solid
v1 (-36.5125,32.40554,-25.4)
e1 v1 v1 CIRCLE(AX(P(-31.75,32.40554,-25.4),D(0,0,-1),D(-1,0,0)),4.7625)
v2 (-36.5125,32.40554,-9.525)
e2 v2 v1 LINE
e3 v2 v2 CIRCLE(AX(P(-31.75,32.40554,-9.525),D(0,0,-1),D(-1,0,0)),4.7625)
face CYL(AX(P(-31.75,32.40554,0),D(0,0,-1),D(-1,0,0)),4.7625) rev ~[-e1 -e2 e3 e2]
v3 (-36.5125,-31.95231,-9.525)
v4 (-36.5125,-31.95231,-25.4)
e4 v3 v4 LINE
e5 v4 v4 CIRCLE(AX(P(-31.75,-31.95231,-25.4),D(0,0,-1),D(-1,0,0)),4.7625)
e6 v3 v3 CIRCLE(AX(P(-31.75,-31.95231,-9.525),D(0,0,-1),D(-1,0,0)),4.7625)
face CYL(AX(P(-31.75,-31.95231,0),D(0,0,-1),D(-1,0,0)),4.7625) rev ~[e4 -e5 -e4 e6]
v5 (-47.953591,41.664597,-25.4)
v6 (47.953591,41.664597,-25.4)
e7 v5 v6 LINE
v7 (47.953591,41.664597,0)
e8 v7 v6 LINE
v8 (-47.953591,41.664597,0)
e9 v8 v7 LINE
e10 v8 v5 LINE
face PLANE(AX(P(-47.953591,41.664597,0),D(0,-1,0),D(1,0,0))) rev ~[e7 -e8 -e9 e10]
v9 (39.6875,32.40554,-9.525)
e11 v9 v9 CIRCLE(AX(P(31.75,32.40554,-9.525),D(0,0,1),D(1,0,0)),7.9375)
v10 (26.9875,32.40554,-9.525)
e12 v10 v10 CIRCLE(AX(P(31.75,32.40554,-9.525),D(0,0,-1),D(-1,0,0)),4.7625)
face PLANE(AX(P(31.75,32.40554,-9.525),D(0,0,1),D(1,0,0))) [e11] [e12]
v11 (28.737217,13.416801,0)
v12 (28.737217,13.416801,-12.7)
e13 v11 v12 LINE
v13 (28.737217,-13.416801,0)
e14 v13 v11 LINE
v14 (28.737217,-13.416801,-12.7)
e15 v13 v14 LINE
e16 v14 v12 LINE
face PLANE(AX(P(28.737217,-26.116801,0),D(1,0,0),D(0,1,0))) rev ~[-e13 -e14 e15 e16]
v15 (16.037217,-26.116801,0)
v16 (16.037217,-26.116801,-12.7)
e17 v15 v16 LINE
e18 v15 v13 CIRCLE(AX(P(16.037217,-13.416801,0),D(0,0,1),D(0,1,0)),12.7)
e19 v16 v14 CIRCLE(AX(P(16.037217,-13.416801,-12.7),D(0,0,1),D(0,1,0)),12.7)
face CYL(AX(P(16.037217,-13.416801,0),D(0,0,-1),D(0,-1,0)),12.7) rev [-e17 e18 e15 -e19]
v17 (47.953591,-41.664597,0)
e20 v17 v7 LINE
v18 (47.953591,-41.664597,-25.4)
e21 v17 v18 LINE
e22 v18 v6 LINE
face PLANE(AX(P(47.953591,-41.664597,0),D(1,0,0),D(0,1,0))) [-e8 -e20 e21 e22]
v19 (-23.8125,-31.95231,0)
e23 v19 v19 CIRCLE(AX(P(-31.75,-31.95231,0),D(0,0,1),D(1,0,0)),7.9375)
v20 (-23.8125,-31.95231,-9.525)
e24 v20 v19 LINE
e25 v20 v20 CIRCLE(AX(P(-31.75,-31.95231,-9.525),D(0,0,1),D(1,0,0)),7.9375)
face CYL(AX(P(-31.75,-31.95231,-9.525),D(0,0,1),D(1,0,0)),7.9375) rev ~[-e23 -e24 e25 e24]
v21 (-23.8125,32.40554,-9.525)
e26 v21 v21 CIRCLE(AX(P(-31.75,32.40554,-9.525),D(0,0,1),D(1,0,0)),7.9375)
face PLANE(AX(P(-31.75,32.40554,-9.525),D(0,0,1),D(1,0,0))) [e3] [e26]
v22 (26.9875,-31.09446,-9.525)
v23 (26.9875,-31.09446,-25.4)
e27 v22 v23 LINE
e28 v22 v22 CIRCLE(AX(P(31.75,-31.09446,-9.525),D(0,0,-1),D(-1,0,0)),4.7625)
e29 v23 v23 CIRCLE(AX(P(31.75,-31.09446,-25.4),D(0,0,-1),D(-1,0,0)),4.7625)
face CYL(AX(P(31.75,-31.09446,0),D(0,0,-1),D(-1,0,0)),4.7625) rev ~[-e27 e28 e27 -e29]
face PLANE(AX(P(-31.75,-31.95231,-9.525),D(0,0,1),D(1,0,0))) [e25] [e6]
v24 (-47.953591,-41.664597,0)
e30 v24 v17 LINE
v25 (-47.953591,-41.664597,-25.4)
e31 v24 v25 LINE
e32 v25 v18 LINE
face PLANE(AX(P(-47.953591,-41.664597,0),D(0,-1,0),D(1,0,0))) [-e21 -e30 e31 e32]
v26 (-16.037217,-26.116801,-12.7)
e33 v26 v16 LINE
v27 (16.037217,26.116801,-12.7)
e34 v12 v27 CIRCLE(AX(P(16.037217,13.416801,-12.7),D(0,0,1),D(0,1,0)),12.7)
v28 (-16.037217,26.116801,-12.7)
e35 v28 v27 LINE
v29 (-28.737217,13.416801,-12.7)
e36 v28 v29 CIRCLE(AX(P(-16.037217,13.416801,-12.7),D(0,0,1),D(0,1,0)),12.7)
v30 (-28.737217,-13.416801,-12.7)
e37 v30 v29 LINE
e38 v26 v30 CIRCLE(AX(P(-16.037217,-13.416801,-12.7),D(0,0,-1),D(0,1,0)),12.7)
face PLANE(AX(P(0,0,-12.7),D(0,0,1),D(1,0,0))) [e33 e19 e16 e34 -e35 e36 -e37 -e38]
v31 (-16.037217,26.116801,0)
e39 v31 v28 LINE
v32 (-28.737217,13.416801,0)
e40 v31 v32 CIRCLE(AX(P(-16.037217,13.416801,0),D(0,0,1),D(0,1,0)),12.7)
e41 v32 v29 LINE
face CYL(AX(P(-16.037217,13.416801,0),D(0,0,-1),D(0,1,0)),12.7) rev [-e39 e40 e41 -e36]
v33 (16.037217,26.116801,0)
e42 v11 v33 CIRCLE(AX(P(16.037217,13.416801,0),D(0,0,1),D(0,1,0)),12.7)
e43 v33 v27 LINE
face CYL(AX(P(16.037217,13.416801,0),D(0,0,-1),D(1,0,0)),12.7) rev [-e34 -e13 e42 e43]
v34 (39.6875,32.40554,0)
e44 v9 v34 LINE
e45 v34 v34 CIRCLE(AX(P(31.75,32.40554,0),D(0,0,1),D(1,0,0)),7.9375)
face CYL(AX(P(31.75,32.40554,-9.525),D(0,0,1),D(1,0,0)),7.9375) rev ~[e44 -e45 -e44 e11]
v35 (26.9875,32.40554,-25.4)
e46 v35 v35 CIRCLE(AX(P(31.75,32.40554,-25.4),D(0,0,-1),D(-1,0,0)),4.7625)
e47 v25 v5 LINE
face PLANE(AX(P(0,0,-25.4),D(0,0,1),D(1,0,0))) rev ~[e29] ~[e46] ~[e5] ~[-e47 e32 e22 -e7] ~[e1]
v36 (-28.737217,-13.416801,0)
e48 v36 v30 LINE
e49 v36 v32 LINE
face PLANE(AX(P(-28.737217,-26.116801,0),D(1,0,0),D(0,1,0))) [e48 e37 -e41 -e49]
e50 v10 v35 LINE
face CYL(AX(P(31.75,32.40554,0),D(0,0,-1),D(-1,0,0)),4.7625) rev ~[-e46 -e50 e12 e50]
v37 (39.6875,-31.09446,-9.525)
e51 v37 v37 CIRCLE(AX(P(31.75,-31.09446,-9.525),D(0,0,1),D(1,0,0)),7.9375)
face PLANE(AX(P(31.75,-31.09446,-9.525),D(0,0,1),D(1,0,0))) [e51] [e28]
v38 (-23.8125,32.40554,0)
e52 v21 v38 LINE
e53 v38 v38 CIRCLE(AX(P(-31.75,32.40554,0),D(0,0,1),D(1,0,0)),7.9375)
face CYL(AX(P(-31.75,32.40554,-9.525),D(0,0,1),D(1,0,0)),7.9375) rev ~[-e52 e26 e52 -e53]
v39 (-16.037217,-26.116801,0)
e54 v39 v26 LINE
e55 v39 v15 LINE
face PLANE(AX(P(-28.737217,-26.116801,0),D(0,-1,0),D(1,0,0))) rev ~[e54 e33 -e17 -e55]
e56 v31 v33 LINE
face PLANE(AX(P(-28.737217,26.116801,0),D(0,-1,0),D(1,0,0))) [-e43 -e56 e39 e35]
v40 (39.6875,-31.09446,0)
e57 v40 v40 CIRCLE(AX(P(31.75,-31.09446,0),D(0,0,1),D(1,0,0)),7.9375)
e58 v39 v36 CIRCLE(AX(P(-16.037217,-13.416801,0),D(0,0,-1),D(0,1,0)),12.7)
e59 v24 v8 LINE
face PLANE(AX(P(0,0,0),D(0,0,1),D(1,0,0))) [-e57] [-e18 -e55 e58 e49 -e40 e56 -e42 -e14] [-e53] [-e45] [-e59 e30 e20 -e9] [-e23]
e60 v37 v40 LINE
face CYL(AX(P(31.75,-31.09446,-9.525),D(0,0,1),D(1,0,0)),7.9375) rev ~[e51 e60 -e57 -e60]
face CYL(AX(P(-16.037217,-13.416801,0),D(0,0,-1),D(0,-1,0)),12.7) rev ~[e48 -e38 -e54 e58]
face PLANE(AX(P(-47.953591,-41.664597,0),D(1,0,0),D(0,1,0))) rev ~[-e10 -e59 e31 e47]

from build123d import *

# Parameters (mm, degrees)
F0_W           = 95.9071815014
F0_H           = 83.329193294
F1_DEPTH       = 25.4
F2_W           = 57.4744343758
F2_H           = 52.2336028516
F3_DEPTH       = 12.7
F4_R           = 12.7
F6_D           = 9.525
F6_CBORE_D     = 15.875
F6_CBORE_DEPTH = 9.525


# Not quite as in the source:
# - a length typed as a fraction of an inch, garbled in the dataset ("3 / 203.2 mm" for 3/8 in), is restored


with BuildPart() as f1:
    # F0 (on Top) → F1 (new body)
    with BuildSketch(Plane.XY):
        Rectangle(F0_W, F0_H)
    extrude(amount=-F1_DEPTH)

    # F2 (on face) → F3 (cut)
    with BuildSketch(Plane.XY):
        Rectangle(F2_W, F2_H)
    extrude(amount=-F3_DEPTH, mode=Mode.SUBTRACT)

    # F4
    f4_edges = [f1.edges().sort_by_distance(p)[0] for p in [
        (-28.737217, 26.116801, -6.35),
        (28.737217, 26.116801, -6.35),
        (-28.737217, -26.116801, -6.35),
        (28.737217, -26.116801, -6.35),
    ]]
    fillet(f4_edges, radius=F4_R)

    # F6 (through all)
    with Locations(Plane.XY):
        with Locations((-31.75, 32.4055403471), (31.75, 32.4055403471), (31.75, -31.0944596529), (-31.75, -31.9523103535)):
            CounterBoreHole(F6_D / 2, F6_CBORE_D / 2, F6_CBORE_DEPTH)


solid = f1.part
